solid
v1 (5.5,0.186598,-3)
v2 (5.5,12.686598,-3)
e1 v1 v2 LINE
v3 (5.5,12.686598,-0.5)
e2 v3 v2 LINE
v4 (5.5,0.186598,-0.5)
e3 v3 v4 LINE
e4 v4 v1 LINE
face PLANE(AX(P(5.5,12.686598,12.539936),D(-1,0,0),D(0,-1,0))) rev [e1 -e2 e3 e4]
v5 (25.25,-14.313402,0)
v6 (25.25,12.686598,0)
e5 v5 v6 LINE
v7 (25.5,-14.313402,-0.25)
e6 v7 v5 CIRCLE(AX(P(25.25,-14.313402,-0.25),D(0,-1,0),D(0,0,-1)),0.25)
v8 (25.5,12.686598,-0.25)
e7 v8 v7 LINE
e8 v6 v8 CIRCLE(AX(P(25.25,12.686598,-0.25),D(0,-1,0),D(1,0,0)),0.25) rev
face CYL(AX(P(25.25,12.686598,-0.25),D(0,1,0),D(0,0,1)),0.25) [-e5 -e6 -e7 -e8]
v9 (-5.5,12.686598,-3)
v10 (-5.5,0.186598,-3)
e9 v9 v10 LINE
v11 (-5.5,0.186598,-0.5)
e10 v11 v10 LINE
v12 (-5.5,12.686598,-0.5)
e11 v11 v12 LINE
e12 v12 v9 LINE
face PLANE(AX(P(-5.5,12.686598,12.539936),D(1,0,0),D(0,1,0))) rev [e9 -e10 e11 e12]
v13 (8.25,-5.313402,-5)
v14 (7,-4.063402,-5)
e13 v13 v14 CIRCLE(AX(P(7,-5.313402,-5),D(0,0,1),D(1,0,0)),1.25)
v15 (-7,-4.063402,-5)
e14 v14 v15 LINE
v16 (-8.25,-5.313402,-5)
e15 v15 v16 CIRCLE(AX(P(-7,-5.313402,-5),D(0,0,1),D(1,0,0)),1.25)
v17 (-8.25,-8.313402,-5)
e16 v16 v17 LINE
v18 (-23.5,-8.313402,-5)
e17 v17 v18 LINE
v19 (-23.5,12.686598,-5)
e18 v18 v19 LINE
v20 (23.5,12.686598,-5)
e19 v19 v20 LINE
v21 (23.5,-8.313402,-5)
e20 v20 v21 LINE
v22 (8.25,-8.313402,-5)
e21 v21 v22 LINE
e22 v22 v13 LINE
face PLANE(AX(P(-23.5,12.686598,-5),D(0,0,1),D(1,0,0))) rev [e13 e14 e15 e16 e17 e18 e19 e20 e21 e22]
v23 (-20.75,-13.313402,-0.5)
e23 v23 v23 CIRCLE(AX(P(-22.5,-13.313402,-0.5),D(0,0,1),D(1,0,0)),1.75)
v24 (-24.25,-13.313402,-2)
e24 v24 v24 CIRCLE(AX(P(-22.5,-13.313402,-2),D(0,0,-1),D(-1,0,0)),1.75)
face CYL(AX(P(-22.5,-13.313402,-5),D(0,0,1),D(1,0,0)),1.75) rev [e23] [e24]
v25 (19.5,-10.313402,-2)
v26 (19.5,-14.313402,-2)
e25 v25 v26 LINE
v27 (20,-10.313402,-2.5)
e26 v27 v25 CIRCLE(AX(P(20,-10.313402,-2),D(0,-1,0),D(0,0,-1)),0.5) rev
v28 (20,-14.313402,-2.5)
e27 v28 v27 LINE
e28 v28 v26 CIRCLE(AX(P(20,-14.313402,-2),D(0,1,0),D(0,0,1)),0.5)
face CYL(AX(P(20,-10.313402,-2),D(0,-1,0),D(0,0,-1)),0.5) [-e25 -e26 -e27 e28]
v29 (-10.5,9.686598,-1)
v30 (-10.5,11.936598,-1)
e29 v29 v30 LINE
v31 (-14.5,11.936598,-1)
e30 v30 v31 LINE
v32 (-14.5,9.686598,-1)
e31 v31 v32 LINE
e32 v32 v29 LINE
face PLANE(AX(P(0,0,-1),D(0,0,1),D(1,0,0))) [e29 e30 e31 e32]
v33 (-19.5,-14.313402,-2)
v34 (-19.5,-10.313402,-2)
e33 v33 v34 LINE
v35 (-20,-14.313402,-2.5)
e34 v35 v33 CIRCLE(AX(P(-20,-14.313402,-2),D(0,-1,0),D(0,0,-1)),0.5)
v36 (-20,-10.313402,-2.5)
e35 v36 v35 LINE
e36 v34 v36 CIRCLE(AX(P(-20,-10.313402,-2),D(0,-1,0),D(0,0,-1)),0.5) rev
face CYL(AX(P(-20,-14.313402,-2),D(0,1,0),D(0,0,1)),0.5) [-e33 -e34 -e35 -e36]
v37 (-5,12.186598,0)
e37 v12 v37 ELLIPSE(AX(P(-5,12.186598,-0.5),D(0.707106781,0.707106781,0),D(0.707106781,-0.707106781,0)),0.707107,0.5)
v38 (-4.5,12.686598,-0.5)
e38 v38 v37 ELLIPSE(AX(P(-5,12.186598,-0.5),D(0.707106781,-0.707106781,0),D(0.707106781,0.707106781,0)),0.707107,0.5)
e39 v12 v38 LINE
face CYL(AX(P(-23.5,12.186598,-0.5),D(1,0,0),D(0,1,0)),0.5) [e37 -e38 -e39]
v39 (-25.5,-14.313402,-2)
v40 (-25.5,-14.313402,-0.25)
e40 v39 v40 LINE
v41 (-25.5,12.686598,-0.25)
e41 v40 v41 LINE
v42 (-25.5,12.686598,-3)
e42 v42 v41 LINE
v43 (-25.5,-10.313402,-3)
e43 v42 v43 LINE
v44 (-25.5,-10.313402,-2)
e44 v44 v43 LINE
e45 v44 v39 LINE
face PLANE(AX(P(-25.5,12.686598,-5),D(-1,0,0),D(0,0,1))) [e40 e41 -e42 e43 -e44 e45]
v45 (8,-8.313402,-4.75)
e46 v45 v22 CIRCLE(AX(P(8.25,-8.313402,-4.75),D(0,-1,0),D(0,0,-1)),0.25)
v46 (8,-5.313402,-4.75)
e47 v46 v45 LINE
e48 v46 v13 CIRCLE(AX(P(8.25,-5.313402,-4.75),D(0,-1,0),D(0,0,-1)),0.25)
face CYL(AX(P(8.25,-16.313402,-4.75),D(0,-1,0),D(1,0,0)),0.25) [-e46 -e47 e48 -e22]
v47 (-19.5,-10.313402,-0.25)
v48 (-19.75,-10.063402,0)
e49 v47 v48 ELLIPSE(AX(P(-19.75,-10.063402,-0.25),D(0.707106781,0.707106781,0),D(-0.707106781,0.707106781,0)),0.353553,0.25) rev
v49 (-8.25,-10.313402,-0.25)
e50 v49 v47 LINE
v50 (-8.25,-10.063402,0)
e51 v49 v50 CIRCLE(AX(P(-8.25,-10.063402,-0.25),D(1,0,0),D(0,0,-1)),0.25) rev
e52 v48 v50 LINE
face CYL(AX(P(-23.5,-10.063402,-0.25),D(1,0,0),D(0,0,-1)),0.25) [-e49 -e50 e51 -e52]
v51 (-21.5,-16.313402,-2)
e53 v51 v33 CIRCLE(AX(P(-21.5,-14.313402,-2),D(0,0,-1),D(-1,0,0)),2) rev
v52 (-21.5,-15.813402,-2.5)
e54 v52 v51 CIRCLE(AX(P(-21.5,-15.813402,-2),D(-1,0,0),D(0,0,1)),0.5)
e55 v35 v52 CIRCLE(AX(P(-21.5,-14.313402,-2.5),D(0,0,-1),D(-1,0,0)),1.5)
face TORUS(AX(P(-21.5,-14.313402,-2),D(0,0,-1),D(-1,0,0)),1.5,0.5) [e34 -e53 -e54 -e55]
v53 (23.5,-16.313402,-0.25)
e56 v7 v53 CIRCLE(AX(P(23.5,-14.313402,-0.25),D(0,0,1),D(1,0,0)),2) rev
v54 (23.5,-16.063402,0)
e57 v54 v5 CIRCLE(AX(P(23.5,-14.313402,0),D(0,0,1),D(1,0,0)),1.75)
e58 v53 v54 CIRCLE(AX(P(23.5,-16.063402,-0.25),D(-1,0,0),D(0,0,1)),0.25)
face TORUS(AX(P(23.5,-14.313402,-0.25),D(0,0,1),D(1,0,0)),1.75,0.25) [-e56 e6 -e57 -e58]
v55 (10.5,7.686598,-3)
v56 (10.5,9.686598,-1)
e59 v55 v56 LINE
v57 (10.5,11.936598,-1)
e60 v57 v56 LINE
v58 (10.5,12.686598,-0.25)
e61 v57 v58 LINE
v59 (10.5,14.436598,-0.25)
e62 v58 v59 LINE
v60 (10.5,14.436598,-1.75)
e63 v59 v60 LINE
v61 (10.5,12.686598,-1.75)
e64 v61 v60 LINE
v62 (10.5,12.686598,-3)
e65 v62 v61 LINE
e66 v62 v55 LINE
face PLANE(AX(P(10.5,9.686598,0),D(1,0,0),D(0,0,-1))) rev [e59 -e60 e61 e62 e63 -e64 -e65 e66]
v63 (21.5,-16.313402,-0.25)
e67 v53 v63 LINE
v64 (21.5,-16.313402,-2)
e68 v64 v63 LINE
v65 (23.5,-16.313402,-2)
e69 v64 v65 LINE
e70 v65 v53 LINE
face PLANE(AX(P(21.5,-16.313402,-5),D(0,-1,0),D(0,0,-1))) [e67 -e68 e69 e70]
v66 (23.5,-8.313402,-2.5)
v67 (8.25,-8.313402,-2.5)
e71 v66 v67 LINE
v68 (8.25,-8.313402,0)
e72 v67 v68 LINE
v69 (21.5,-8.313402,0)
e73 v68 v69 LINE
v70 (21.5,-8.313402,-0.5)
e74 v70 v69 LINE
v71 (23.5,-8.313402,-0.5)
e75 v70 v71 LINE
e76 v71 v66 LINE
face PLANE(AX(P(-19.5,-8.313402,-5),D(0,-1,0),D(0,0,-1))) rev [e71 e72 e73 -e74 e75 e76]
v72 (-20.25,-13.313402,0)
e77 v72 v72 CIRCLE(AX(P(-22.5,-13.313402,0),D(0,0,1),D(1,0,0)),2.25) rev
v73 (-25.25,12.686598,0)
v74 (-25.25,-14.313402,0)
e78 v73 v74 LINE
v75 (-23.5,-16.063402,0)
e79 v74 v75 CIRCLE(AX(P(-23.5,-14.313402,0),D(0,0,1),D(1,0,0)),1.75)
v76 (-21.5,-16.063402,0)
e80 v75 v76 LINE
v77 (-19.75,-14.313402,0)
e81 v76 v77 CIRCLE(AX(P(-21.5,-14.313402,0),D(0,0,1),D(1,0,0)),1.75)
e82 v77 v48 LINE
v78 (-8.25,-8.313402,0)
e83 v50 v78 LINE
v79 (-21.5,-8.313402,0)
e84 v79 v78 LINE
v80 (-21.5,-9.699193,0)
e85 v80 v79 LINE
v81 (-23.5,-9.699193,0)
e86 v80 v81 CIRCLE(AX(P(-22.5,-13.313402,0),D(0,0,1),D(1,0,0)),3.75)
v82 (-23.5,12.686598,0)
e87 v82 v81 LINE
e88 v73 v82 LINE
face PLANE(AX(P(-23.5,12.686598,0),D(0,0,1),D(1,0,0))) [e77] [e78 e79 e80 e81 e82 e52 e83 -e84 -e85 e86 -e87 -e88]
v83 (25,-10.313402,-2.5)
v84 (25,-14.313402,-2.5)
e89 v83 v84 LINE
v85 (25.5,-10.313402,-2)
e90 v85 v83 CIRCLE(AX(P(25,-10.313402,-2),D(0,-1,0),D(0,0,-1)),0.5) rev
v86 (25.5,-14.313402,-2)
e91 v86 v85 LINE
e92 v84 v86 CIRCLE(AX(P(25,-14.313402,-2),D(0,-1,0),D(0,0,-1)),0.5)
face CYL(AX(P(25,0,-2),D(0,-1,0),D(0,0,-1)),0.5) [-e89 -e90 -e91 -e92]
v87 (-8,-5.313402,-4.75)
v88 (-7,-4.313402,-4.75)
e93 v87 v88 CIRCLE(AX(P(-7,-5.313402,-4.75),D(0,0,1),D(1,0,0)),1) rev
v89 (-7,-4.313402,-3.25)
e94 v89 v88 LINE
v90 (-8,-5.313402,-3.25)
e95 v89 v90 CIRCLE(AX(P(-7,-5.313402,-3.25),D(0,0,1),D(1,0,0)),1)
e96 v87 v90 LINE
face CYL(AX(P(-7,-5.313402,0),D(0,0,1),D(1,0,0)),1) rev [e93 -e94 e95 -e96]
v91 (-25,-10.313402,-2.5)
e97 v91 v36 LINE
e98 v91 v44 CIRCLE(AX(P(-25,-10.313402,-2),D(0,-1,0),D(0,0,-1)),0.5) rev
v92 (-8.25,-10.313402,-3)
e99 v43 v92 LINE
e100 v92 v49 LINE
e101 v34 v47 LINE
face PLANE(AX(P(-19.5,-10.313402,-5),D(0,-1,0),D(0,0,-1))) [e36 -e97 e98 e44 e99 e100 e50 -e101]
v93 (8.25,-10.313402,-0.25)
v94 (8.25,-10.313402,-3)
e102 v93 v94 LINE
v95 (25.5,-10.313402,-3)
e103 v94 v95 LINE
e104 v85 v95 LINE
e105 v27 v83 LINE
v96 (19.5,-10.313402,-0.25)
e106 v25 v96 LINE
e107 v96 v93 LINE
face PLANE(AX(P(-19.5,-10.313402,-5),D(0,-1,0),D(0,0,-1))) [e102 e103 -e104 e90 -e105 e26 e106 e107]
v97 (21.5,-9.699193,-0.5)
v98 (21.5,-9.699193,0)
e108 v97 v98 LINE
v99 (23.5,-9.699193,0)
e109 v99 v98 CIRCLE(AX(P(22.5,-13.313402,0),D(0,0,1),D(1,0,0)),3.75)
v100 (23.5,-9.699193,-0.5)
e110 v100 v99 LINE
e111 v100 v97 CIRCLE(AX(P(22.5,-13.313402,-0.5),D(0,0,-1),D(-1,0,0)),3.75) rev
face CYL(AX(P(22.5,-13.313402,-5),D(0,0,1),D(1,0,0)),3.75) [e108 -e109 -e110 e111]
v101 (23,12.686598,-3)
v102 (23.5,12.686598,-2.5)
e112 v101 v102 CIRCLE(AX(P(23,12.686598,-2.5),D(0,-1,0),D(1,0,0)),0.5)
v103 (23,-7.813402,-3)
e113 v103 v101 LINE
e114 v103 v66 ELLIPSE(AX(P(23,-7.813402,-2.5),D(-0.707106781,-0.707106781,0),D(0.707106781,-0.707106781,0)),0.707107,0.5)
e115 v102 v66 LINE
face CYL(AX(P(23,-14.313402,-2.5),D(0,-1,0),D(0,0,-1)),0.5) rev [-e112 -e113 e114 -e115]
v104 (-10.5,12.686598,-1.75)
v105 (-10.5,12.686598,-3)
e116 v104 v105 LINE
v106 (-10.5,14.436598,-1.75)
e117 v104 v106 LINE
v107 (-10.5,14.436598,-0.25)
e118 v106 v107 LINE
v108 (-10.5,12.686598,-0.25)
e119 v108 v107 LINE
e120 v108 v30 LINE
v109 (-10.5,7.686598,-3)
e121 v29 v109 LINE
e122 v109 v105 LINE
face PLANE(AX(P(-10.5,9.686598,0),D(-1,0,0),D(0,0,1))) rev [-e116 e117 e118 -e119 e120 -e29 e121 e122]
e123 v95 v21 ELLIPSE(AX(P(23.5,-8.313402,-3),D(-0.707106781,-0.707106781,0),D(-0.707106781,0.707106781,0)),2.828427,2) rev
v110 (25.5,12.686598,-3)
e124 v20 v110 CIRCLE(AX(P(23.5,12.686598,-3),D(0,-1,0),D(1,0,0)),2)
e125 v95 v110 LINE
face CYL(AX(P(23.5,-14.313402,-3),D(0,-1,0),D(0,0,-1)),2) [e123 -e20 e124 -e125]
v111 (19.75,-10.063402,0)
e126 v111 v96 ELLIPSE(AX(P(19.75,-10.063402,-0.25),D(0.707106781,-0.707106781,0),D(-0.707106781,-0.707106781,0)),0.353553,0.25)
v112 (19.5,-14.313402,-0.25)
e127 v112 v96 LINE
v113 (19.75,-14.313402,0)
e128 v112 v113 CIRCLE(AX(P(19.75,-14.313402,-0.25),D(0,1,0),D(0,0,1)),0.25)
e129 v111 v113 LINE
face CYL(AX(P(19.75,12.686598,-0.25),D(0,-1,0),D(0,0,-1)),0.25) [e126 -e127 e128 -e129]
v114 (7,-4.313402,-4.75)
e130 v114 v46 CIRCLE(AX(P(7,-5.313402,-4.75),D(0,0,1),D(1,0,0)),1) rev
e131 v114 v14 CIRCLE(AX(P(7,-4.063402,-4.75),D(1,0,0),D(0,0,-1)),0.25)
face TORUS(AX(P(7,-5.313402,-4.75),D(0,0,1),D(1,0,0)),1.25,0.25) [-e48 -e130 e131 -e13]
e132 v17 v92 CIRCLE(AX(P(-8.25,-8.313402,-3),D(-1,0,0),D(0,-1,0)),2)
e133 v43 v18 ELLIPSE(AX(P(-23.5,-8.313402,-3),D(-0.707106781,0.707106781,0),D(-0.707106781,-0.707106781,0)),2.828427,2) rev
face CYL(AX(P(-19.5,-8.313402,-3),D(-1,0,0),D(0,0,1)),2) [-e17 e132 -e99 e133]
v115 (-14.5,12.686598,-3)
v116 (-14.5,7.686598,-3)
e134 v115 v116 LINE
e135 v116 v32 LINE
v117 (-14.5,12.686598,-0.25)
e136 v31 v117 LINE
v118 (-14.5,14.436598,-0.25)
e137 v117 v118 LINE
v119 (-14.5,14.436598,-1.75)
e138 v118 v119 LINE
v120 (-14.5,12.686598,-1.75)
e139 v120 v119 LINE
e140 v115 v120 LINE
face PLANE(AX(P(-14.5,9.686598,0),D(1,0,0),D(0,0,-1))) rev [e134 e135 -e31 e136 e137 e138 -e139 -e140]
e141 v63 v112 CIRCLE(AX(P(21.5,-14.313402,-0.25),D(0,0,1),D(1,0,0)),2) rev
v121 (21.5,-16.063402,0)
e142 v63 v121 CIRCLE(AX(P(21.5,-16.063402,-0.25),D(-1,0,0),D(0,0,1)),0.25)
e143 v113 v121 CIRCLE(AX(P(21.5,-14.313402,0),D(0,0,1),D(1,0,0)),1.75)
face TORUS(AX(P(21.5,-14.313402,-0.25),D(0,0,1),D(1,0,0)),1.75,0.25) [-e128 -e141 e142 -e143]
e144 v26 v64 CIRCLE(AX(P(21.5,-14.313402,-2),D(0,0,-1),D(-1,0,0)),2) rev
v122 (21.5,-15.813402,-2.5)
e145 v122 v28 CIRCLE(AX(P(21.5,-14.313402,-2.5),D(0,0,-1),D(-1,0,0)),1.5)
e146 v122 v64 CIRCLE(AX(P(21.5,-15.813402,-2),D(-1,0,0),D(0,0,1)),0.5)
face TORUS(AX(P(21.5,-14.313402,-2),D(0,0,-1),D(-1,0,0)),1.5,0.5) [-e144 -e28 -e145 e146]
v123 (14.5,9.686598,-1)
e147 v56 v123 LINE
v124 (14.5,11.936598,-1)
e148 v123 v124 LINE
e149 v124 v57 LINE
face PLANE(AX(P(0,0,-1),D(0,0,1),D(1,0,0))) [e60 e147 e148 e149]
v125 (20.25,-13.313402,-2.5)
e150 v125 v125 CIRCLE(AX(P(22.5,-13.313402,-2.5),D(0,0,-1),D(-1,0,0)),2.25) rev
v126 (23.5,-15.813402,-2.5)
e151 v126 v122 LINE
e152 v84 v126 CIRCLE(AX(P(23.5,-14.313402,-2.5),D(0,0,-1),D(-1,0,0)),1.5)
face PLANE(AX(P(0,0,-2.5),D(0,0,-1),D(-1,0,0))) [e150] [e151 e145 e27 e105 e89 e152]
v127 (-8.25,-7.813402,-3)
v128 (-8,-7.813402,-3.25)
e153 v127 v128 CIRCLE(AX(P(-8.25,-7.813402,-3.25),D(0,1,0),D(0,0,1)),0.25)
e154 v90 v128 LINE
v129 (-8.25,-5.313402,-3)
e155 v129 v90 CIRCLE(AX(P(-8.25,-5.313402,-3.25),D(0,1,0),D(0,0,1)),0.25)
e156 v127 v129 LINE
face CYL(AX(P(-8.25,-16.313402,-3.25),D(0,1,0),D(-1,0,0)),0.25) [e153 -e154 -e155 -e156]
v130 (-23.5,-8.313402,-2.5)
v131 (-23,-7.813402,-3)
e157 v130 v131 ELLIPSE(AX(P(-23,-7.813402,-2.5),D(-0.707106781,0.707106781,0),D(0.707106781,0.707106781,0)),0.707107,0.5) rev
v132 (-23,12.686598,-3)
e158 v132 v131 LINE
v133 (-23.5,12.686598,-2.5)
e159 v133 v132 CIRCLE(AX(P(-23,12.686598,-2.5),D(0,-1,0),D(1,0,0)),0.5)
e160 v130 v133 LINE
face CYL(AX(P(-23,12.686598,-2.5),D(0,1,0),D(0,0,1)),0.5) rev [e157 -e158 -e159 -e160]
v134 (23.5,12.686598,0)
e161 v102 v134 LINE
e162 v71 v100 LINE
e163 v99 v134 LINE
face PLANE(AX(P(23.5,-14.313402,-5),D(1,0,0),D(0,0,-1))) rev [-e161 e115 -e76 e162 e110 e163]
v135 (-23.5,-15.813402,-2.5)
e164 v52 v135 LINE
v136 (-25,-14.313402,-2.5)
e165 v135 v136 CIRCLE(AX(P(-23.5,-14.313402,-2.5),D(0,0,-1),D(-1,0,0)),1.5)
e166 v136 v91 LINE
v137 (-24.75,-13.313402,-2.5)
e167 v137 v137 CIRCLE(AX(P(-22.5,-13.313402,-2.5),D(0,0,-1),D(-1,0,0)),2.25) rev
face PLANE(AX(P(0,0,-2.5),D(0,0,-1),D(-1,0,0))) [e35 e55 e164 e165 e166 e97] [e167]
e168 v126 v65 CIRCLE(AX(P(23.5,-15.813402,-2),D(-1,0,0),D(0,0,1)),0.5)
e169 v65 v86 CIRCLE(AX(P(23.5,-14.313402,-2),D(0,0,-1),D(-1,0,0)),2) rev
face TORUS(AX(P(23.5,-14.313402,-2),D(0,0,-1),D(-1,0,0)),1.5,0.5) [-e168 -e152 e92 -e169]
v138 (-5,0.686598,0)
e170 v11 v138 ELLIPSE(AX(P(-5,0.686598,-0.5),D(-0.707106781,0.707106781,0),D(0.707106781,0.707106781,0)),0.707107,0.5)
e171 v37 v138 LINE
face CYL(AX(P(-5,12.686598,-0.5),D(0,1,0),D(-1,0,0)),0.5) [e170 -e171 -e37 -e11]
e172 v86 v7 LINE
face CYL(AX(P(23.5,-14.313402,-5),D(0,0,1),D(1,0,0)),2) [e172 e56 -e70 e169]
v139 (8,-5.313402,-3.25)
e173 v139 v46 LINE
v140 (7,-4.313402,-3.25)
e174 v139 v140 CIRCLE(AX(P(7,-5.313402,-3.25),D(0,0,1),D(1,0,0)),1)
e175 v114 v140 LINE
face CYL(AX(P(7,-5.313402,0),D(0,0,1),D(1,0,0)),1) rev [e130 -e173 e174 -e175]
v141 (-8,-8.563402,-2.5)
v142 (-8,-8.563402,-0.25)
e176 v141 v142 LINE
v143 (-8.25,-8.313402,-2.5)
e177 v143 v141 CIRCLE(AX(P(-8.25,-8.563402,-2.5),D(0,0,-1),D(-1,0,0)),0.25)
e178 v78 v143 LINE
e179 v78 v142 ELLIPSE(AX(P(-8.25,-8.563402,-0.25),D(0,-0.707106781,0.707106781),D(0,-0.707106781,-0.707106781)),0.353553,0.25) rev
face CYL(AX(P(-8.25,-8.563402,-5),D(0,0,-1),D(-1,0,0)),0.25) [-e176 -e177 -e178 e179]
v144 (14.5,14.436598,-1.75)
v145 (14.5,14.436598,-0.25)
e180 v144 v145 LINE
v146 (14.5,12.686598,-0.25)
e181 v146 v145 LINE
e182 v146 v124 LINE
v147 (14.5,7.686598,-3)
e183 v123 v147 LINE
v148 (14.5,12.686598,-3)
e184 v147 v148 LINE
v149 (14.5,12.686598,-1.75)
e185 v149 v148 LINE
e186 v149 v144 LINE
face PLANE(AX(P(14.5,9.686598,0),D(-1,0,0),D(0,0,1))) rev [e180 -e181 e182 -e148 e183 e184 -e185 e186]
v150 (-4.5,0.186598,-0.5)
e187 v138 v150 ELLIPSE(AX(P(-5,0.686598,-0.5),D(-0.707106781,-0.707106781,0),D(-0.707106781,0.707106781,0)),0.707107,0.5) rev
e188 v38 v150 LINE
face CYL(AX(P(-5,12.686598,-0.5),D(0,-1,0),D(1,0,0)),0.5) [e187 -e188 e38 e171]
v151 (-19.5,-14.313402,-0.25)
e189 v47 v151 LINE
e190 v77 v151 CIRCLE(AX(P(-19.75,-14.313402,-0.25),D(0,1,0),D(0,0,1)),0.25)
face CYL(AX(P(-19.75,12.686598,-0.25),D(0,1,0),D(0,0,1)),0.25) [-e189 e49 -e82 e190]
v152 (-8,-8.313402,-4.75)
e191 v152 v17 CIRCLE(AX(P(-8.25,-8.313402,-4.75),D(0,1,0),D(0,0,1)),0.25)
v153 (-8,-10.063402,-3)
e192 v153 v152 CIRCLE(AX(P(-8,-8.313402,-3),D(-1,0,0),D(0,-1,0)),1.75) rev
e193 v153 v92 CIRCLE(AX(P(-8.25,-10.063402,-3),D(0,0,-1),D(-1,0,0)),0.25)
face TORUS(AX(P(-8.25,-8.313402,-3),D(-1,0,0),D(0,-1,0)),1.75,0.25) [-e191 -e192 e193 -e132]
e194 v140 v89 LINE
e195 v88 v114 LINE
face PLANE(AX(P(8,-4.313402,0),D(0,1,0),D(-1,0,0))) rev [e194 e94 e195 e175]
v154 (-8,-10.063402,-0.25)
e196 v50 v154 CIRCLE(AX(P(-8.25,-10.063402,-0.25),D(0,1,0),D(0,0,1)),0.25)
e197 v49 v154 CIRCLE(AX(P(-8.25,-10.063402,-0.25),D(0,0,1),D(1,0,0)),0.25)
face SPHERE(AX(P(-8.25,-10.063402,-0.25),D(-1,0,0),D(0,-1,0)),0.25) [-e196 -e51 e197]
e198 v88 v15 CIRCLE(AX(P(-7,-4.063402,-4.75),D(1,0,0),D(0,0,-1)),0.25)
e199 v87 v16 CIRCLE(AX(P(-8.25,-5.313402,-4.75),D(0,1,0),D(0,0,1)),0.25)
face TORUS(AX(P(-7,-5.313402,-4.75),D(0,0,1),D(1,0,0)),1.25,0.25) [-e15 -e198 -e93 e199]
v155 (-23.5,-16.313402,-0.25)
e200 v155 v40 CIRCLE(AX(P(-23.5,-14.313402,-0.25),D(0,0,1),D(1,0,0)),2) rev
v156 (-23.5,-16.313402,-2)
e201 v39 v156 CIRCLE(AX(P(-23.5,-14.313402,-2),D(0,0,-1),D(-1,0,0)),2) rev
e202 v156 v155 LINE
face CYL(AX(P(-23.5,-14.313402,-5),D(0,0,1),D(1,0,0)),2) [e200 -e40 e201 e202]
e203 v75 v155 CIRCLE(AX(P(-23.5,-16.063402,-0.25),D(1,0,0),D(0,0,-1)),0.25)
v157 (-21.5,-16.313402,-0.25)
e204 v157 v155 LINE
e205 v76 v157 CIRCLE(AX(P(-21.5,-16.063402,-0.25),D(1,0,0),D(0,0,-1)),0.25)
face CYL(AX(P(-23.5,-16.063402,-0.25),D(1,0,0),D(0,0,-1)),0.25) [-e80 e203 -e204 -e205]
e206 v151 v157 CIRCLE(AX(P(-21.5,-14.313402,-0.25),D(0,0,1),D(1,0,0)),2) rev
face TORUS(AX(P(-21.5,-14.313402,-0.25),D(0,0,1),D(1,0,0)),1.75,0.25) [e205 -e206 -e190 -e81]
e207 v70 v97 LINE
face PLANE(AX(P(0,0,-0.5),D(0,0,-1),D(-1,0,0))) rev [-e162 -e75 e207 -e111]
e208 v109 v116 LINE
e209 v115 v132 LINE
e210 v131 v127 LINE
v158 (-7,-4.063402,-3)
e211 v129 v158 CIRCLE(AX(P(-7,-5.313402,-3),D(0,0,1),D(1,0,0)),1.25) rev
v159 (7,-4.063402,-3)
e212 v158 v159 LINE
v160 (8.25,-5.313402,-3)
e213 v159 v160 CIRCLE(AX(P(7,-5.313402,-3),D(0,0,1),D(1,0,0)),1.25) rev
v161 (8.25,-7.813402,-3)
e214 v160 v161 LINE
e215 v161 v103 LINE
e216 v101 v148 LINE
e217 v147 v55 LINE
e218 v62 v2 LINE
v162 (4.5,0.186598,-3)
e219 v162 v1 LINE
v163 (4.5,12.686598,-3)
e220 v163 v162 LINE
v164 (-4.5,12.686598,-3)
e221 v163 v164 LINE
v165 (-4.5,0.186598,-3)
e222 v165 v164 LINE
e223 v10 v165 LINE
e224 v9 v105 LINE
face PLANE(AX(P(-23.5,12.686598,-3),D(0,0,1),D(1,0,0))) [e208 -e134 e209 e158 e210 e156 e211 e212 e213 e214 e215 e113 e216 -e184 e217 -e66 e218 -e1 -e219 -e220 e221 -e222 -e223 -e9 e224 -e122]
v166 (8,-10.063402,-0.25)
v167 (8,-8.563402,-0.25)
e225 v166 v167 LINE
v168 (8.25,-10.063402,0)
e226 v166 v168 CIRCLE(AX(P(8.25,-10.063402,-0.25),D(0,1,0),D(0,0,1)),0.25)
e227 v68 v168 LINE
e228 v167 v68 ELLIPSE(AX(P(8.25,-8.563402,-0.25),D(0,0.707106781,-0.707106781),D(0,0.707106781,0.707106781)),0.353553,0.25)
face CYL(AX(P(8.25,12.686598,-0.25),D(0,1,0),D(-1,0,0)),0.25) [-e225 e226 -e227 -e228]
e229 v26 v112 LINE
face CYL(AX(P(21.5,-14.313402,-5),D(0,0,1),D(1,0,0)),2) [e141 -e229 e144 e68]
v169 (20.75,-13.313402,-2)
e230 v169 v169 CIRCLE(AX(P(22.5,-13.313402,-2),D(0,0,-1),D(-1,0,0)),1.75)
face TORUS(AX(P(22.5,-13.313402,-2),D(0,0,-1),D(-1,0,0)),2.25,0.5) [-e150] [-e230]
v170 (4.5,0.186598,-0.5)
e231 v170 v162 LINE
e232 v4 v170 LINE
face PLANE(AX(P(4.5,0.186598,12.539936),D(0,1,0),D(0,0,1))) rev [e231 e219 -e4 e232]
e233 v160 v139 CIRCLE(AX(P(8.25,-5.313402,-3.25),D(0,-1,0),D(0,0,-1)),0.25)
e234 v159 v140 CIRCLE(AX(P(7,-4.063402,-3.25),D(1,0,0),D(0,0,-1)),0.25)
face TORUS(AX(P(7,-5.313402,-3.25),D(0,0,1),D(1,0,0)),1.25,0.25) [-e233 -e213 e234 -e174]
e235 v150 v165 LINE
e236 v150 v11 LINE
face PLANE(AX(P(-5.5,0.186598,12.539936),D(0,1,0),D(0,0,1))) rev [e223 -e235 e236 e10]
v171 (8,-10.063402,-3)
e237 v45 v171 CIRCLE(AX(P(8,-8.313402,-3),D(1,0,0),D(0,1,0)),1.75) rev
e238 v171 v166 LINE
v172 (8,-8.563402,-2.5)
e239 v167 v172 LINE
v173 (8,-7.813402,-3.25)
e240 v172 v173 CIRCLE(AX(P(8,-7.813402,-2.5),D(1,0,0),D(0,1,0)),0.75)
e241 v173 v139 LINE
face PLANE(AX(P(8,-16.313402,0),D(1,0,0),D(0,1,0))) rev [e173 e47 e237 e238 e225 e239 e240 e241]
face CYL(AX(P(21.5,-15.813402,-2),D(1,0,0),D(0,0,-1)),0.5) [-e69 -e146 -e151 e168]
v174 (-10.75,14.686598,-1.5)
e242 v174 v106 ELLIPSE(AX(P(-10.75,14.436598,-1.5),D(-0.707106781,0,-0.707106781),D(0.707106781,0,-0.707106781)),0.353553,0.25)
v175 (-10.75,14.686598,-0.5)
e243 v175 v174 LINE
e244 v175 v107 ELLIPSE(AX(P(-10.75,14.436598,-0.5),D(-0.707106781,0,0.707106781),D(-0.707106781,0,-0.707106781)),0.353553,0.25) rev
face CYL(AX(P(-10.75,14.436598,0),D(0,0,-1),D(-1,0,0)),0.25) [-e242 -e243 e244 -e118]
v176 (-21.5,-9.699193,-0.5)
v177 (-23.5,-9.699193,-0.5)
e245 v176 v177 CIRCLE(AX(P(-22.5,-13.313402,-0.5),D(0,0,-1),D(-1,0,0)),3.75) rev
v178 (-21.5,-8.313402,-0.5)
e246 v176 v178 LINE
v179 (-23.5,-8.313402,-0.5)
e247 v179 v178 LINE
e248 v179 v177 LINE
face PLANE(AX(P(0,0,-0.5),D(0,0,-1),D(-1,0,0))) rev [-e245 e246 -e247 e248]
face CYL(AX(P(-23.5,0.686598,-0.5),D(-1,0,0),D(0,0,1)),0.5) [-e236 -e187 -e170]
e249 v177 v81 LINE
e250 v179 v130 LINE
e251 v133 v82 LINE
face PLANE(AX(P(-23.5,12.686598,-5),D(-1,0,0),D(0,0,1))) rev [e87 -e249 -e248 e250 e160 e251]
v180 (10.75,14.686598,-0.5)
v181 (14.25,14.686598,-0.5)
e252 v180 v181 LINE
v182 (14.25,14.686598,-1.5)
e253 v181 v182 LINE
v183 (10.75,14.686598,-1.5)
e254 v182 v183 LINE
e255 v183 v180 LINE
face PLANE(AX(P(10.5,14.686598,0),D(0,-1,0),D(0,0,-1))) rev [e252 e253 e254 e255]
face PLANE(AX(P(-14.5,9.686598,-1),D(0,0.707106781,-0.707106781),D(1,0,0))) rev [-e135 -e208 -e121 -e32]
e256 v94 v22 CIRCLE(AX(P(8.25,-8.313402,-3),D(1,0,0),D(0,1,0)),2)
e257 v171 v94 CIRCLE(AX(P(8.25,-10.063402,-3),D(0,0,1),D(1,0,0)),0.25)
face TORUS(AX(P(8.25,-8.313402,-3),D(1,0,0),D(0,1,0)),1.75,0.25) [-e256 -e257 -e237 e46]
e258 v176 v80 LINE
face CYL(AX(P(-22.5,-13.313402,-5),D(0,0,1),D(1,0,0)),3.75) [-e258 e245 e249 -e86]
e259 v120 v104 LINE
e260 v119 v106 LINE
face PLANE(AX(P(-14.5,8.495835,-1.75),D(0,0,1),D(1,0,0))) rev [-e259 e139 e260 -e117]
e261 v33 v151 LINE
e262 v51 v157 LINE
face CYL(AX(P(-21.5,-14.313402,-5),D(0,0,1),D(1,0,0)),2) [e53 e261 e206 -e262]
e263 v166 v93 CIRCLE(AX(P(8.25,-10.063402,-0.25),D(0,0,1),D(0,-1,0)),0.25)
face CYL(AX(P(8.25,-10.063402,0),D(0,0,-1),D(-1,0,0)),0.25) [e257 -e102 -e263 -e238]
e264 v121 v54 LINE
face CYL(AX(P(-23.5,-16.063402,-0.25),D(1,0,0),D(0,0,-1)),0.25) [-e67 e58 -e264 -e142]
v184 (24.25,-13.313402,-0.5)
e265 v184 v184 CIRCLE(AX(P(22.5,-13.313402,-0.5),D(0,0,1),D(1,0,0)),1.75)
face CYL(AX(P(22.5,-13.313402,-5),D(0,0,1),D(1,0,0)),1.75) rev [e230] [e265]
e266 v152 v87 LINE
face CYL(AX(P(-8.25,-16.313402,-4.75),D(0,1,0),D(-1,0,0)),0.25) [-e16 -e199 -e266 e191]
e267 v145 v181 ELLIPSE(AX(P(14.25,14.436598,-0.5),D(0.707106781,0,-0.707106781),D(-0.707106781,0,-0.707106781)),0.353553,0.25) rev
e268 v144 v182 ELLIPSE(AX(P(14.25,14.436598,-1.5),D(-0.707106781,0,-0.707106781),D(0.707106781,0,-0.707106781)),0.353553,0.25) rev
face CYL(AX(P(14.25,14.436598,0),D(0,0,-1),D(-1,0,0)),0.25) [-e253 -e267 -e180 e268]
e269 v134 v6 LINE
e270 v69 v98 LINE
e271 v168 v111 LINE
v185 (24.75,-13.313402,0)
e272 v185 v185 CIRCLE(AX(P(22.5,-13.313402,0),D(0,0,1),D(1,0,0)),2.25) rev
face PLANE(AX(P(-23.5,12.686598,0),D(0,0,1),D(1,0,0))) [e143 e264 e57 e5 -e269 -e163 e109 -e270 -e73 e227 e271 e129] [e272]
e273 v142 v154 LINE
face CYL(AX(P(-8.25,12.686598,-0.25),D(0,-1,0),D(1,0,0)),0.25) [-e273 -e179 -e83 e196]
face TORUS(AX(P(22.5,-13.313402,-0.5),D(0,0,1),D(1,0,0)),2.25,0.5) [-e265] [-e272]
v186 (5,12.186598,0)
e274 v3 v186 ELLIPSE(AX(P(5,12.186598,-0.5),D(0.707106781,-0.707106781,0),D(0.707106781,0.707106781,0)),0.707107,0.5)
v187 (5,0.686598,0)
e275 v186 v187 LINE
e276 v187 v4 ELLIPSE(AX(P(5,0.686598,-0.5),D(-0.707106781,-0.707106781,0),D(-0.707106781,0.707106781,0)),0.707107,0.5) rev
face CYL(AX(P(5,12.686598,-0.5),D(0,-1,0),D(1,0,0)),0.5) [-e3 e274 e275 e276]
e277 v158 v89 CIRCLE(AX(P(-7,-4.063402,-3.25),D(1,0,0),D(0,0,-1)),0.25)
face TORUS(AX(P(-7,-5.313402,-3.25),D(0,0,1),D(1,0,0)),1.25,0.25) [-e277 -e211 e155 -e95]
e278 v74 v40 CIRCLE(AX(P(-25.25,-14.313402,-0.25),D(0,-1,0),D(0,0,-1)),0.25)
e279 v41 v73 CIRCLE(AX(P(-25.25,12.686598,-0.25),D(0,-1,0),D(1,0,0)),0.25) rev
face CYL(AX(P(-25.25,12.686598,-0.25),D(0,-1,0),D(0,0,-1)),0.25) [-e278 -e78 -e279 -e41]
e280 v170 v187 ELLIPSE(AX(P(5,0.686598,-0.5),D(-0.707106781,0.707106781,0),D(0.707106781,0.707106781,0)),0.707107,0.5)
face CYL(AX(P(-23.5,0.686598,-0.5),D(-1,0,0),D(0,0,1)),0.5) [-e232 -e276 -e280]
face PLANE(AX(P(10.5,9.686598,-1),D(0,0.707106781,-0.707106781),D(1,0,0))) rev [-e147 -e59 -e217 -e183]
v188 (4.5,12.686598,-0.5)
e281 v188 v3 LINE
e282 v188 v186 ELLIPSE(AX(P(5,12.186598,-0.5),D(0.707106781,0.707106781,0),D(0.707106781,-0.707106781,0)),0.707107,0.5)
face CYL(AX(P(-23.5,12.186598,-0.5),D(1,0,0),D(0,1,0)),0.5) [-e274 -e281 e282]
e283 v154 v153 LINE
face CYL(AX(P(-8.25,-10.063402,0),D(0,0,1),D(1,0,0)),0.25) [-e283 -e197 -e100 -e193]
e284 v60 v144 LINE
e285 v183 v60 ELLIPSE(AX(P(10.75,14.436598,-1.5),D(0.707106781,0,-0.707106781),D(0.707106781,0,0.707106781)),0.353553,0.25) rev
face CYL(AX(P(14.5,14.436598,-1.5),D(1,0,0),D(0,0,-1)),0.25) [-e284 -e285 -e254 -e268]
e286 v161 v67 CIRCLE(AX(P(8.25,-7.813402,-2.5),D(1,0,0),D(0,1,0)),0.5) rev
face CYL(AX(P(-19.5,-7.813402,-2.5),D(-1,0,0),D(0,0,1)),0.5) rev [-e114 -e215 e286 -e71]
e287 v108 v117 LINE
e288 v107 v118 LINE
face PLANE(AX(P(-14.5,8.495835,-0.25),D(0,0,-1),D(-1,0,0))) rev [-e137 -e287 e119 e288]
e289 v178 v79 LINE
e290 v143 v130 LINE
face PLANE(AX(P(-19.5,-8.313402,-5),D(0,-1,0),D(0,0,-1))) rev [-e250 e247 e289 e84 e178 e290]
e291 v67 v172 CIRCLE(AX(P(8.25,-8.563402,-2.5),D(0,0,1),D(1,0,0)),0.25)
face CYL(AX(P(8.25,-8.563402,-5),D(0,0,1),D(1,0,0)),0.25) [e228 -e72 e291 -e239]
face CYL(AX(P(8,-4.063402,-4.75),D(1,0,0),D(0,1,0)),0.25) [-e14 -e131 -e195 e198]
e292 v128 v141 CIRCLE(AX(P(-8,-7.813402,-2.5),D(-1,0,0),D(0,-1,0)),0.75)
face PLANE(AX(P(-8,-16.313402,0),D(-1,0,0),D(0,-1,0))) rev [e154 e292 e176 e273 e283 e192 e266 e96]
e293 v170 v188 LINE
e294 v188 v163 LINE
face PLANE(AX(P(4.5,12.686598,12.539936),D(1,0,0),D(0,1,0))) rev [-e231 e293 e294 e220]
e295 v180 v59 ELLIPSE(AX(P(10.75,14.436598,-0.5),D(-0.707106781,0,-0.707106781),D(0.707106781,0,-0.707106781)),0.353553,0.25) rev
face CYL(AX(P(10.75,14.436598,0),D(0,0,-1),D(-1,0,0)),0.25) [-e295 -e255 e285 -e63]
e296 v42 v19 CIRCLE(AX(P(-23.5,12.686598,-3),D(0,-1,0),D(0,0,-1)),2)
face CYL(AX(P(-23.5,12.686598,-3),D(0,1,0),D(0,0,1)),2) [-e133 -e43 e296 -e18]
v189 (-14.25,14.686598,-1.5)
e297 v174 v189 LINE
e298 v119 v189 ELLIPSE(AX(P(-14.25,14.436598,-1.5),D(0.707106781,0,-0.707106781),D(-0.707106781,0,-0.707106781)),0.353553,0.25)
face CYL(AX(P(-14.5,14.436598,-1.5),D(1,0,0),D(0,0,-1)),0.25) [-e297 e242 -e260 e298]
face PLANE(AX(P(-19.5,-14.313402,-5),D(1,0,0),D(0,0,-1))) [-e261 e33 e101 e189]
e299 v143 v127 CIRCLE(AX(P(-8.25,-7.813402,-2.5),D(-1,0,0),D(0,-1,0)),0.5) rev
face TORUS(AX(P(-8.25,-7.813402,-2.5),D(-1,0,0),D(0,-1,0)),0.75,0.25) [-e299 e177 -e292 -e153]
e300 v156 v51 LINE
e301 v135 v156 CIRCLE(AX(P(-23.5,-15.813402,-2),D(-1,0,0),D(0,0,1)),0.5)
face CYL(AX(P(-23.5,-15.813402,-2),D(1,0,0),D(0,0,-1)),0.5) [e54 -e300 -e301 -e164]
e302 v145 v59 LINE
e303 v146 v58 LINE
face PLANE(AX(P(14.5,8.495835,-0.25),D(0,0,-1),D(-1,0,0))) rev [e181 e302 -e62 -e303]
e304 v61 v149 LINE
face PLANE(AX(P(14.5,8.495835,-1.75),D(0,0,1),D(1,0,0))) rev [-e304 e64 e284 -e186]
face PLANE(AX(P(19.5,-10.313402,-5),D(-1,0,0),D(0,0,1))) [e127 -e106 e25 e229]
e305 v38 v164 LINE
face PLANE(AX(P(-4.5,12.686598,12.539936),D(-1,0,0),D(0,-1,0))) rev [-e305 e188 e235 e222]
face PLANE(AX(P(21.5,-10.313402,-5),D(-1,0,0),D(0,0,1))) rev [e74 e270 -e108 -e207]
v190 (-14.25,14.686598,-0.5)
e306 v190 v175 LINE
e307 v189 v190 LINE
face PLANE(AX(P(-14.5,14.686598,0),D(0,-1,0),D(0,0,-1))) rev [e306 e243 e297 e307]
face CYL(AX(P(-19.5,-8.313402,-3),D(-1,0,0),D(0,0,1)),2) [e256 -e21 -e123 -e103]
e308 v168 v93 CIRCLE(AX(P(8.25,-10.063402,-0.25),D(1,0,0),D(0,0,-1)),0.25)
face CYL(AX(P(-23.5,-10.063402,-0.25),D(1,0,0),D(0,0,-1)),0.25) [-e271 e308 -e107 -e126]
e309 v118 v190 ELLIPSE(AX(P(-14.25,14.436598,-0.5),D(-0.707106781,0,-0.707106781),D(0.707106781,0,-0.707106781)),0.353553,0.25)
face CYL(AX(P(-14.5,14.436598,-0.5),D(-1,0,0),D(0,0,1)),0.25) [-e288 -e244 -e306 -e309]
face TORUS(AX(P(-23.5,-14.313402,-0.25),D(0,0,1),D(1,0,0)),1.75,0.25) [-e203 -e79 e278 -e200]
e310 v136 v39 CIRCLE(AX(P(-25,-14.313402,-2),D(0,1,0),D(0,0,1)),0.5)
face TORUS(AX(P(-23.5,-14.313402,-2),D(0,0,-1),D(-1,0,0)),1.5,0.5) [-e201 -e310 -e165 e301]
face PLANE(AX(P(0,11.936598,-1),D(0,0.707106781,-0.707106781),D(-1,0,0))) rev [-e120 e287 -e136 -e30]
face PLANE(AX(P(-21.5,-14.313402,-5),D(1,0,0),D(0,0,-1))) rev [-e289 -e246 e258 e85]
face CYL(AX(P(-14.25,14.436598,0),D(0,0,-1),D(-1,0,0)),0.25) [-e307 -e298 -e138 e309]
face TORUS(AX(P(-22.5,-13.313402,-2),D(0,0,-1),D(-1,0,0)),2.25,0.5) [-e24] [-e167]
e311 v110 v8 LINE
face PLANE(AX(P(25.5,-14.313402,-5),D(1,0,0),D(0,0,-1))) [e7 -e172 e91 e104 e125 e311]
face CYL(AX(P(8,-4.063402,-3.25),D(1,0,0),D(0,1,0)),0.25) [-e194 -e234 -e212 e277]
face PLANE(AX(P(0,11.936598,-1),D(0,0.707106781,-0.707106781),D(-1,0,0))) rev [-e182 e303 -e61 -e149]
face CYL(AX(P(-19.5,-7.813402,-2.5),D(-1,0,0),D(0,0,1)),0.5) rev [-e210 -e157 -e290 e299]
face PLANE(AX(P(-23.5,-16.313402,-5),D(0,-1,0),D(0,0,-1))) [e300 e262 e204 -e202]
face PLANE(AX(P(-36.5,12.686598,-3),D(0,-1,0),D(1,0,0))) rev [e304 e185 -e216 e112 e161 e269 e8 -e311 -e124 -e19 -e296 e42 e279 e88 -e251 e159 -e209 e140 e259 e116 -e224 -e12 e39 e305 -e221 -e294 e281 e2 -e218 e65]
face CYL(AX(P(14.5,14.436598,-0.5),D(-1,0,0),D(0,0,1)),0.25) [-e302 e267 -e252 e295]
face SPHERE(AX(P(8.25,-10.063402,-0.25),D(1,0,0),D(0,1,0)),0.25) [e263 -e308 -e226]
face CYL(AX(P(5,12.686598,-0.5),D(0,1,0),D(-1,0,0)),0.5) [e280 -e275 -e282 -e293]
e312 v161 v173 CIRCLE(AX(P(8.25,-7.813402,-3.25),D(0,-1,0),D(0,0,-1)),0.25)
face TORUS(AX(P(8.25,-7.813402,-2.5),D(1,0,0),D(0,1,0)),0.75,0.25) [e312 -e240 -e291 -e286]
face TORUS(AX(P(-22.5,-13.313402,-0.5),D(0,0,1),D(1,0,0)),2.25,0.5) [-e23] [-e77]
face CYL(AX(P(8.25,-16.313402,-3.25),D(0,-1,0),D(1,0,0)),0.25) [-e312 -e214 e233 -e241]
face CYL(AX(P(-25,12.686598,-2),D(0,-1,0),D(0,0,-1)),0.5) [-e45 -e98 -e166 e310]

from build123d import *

# Parameters (mm, degrees)
CROQUIS1_R              = 1.75
SALIENTE_EXTRUIR1_DEPTH = 5
CROQUIS2_W              = 51.235459784
CROQUIS2_H              = 7.088807175
CORTAR_EXTRUIR1_DEPTH   = 2.5
REDONDEO2_R             = 2
VACIADO1_START          = -3
VACIADO1_OUTLINE_W      = 47
VACIADO1_OUTLINE_H      = 21
VACIADO1_DEPTH          = 3
VACIADO1_START_2        = -0.5
VACIADO1_2_DEPTH        = 0.5
CROQUIS3_W              = 16
CROQUIS3_H              = 12
CORTAR_EXTRUIR2_DEPTH   = 5
REDONDEO3_R             = 1
CORTAR_EXTRUIR3_DEPTH   = 62
CROQUIS5_W              = 1
CROQUIS5_H              = 12.5
SALIENTE_EXTRUIR2_DEPTH = 3
CROQUIS6_W              = 4
CROQUIS6_H              = 5
SALIENTE_EXTRUIR3_DEPTH = 3
CROQUIS7_W              = 4
CROQUIS7_H              = 1.25
CROQUIS7_H_2            = 0.25
CORTAR_EXTRUIR4_DEPTH   = 2
CROQUIS8_W              = 4
CROQUIS8_H              = 3
CORTAR_EXTRUIR5_DEPTH   = 1
CHAFL_N1_SIZE           = 2
REDONDEO4_R             = 0.5
REDONDEO5_R             = 0.25
REDONDEO6_R             = 0.5
CHAFL_N2_SIZE           = 0.75
REDONDEO7_R             = 0.25


# Read off the part's stored shape, not the designer's step: Vaciado1
with BuildPart() as part:
    # Croquis1 → Saliente-Extruir1 (new body)
    with BuildSketch(Plane.XY):
        with BuildLine():
            Line((-25.5, 12.686598493), (-25.5, -14.313401507))
            ThreePointArc((-25.5, -14.313401507), (-24.914213562, -15.727615069), (-23.5, -16.313401507))
            Line((-23.5, -16.313401507), (-21.5, -16.313401507))
            ThreePointArc((-21.5, -16.313401507), (-20.085786438, -15.727615069), (-19.5, -14.313401507))
            Line((-19.5, -14.313401507), (-19.5, -10.313401507))
            Line((-19.5, -10.313401507), (19.5, -10.313401507))
            Line((19.5, -10.313401507), (19.5, -14.313401507))
            ThreePointArc((19.5, -14.313401507), (20.085786438, -15.727615069), (21.5, -16.313401507))
            Line((21.5, -16.313401507), (23.5, -16.313401507))
            ThreePointArc((23.5, -16.313401507), (24.914213562, -15.727615069), (25.5, -14.313401507))
            Line((25.5, -14.313401507), (25.5, 12.686598493))
            ThreePointArc((25.5, 12.686598493), (24.914213562, 14.100812055), (23.5, 14.686598493))
            Line((23.5, 14.686598493), (-23.5, 14.686598493))
            ThreePointArc((-23.5, 14.686598493), (-24.914213562, 14.100812055), (-25.5, 12.686598493))
        make_face()
        with Locations((-22.5, -13.313401507)):
            Circle(CROQUIS1_R, mode=Mode.SUBTRACT)
        with Locations((22.5, -13.313401507)):
            Circle(CROQUIS1_R, mode=Mode.SUBTRACT)
    extrude(amount=-SALIENTE_EXTRUIR1_DEPTH)

    # Croquis2 → Cortar-Extruir1 (cut)
    with BuildSketch(Plane(origin=(0, 0, -5), x_dir=(-1, 0, 0), z_dir=(0, 0, -1))):
        with Locations((0.117729892, -13.857805095)):
            Rectangle(CROQUIS2_W, CROQUIS2_H)
    extrude(amount=-CORTAR_EXTRUIR1_DEPTH, mode=Mode.SUBTRACT)

    # Redondeo2
    redondeo2_edges = [part.edges().sort_by_distance(p)[0] for p in [
        (0, -10.313401507, -5),
        (-24.914213562, 14.100812055, -5),
        (24.914213562, 14.100812055, -5),
        (0, 14.686598493, -5),
        (25.5, 1.186598493, -5),
        (-25.5, 1.186598493, -5),
    ]]
    fillet(redondeo2_edges, radius=REDONDEO2_R)

    # Vaciado1 outline → Vaciado1 (cut)
    with BuildSketch(Plane.XY.offset(VACIADO1_START)):
        with Locations((0, 2.186598493)):
            Rectangle(VACIADO1_OUTLINE_W, VACIADO1_OUTLINE_H)
    extrude(amount=VACIADO1_DEPTH, mode=Mode.SUBTRACT)

    # Vaciado1 2 outline → Vaciado1 2 (cut)
    with BuildSketch(Plane.XY.offset(VACIADO1_START_2)):
        with BuildLine():
            Line((23.5, -8.313401507), (21.5, -8.313401507))
            Line((21.5, -8.313401507), (21.5, -9.699193433))
            ThreePointArc((21.5, -9.699193433), (22.5, -9.563401507), (23.5, -9.699193433))
            Line((23.5, -9.699193433), (23.5, -8.313401507))
        make_face()
        with BuildLine():
            Line((-21.5, -9.699193433), (-21.5, -8.313401507))
            Line((-21.5, -8.313401507), (-23.5, -8.313401507))
            Line((-23.5, -8.313401507), (-23.5, -9.699193433))
            ThreePointArc((-23.5, -9.699193433), (-22.5, -9.563401507), (-21.5, -9.699193433))
        make_face()
    extrude(amount=VACIADO1_2_DEPTH, mode=Mode.SUBTRACT)

    # Croquis3 → Cortar-Extruir2 (cut)
    with BuildSketch(Plane(origin=(0, 0, -5), x_dir=(-1, 0, 0), z_dir=(0, 0, -1))):
        with Locations((0, -10.313401507)):
            Rectangle(CROQUIS3_W, CROQUIS3_H)
    extrude(amount=-CORTAR_EXTRUIR2_DEPTH, mode=Mode.SUBTRACT)

    # Redondeo3
    redondeo3_edges = [part.edges().sort_by_distance(p)[0] for p in [
        (-8, -4.313401507, -4),
        (8, -4.313401507, -4),
    ]]
    fillet(redondeo3_edges, radius=REDONDEO3_R)

    # Croquis4 → Cortar-Extruir3 (cut)
    with BuildSketch(Plane(origin=(25.5, 0, 0), x_dir=(0, 0, -1), z_dir=(1, 0, 0))):
        Polygon((0, 12.686598493), (3, 12.686598493), (5, 12.686598493), (5, 16.306246872), (0, 16.306246872), align=None)
    extrude(amount=-CORTAR_EXTRUIR3_DEPTH, mode=Mode.SUBTRACT)

    # Croquis5 → Saliente-Extruir2 (add)
    with BuildSketch(Plane.XY.offset(-3)):
        with Locations((-5, 6.436598493)):
            Rectangle(CROQUIS5_W, CROQUIS5_H)
        with Locations((5, 6.436598493)):
            Rectangle(CROQUIS5_W, CROQUIS5_H)
    extrude(amount=SALIENTE_EXTRUIR2_DEPTH)

    # Croquis6 → Saliente-Extruir3 (add)
    with BuildSketch(Plane.XY.offset(-3)):
        with Locations((-12.5, 12.186598493)):
            Rectangle(CROQUIS6_W, CROQUIS6_H)
        with Locations((12.5, 12.186598493)):
            Rectangle(CROQUIS6_W, CROQUIS6_H)
    extrude(amount=SALIENTE_EXTRUIR3_DEPTH)

    # Croquis7 → Cortar-Extruir4 (cut)
    with BuildSketch(Plane(origin=(0, 14.686598493, 0), x_dir=(1, 0, 0), z_dir=(0, 1, 0))):
        with Locations((-12.5, 2.375)):
            Rectangle(CROQUIS7_W, CROQUIS7_H)
        with Locations((12.5, 2.375)):
            Rectangle(CROQUIS7_W, CROQUIS7_H)
        with Locations((12.5, 0.125)):
            Rectangle(CROQUIS7_W, CROQUIS7_H_2)
        with Locations((-12.5, 0.125)):
            Rectangle(CROQUIS7_W, CROQUIS7_H_2)
    extrude(amount=-CORTAR_EXTRUIR4_DEPTH, mode=Mode.SUBTRACT)

    # Croquis8 → Cortar-Extruir5 (cut)
    with BuildSketch(Plane.XY):
        with Locations((12.5, 11.186598493)):
            Rectangle(CROQUIS8_W, CROQUIS8_H)
        with Locations((-12.5, 11.186598493)):
            Rectangle(CROQUIS8_W, CROQUIS8_H)
    extrude(amount=-CORTAR_EXTRUIR5_DEPTH, mode=Mode.SUBTRACT)

    # Chaflán1
    chafl_n1_edges = [part.edges().sort_by_distance(p)[0] for p in [
        (12.5, 9.686598493, -3),
        (-12.5, 9.686598493, -3),
    ]]
    chamfer(chafl_n1_edges, length=CHAFL_N1_SIZE - 0.0001)  # a hair under: the kernel refuses the full size

    # Redondeo4
    redondeo4_edges = [part.edges().sort_by_distance(p)[0] for p in [
        (-24.25, -13.313401507, 0),
        (20.75, -13.313401507, 0),
        (25.5, -12.313401507, -2.5),
        (22.5, -16.313401507, -2.5),
        (24.914213562, -15.727615069, -2.5),
        (19.5, -12.313401507, -2.5),
        (20.085786438, -15.727615069, -2.5),
        (-20.085786438, -15.727615069, -2.5),
        (-19.5, -12.313401507, -2.5),
        (-25.5, -12.313401507, -2.5),
        (-24.914213562, -15.727615069, -2.5),
        (-22.5, -16.313401507, -2.5),
        (-24.25, -13.313401507, -2.5),
        (20.75, -13.313401507, -2.5),
    ]]
    fillet(redondeo4_edges, radius=REDONDEO4_R)

    # Redondeo5
    redondeo5_edges = [part.edges().sort_by_distance(p)[0] for p in [
        (25.5, -0.813401507, 0),
        (24.914213562, -15.727615069, 0),
        (13.75, -10.313401507, 0),
        (22.5, -16.313401507, 0),
        (20.085786438, -15.727615069, 0),
        (19.5, -12.313401507, 0),
        (-13.75, -10.313401507, 0),
        (-19.5, -12.313401507, 0),
        (-20.085786438, -15.727615069, 0),
        (-22.5, -16.313401507, 0),
        (-24.914213562, -15.727615069, 0),
        (-25.5, -0.813401507, 0),
    ]]
    fillet(redondeo5_edges, radius=REDONDEO5_R)

    # Redondeo6
    redondeo6_edges = [part.edges().sort_by_distance(p)[0] for p in [
        (23.5, 2.186598493, -3),
        (15.75, -8.313401507, -3),
        (-23.5, 2.186598493, -3),
        (-15.75, -8.313401507, -3),
        (-5, 12.686598493, 0),
        (-5.5, 6.436598493, 0),
        (-5, 0.186598493, 0),
        (-4.5, 6.436598493, 0),
        (5, 12.686598493, 0),
        (4.5, 6.436598493, 0),
        (5, 0.186598493, 0),
        (5.5, 6.436598493, 0),
    ]]
    fillet(redondeo6_edges, radius=REDONDEO6_R - 0.0001)  # a hair under: the kernel refuses the full size

    # Chaflán2
    chafl_n2_edges = [part.edges().sort_by_distance(p)[0] for p in [
        (12.5, 12.686598493, -1),
        (-12.5, 12.686598493, -1),
    ]]
    chamfer(chafl_n2_edges, length=CHAFL_N2_SIZE - 0.0001)  # a hair under: the kernel refuses the full size

    # Redondeo7
    redondeo7_edges = [part.edges().sort_by_distance(p)[0] for p in [
        (-8, -6.813401507, -5),
        (-8, -9.727615069, -4.414213562),
        (-8, -8.313401507, -1.25005),
        (8, -9.727615069, -4.414213562),
        (8, -10.313401507, -1.625),
        (8, -9.188401507, 0),
        (8, -6.813401507, -5),
        (0, -4.313401507, -3),
        (0, -4.313401507, -5),
        (-8, -6.563451507, -3),
        (7.707106781, -4.606294726, -5),
        (7.707106781, -4.606294726, -3),
        (-7.707106781, -4.606294726, -5),
        (-7.707106781, -4.606294726, -3),
        (-12.5, 14.686598493, -1.75),
        (10.5, 14.686598493, -1),
        (14.5, 14.686598493, -1),
        (-10.5, 14.686598493, -1),
        (-14.5, 14.686598493, -1),
        (12.5, 14.686598493, -1.75),
        (12.5, 14.686598493, -0.25),
        (-12.5, 14.686598493, -0.25),
        (-8, -9.188401507, 0),
        (8, -10.240178202, -0.073223305),
        (-8, -10.313401507, -1.625),
        (-8, -10.240178202, -0.073223305),
        (8, -6.563451507, -3),
        (8, -8.313401507, -1.25005),
        (8, -8.166984187, -2.85358268),
        (-8, -8.166984187, -2.85358268),
    ]]
    fillet(redondeo7_edges, radius=REDONDEO7_R)


solid = part.part
